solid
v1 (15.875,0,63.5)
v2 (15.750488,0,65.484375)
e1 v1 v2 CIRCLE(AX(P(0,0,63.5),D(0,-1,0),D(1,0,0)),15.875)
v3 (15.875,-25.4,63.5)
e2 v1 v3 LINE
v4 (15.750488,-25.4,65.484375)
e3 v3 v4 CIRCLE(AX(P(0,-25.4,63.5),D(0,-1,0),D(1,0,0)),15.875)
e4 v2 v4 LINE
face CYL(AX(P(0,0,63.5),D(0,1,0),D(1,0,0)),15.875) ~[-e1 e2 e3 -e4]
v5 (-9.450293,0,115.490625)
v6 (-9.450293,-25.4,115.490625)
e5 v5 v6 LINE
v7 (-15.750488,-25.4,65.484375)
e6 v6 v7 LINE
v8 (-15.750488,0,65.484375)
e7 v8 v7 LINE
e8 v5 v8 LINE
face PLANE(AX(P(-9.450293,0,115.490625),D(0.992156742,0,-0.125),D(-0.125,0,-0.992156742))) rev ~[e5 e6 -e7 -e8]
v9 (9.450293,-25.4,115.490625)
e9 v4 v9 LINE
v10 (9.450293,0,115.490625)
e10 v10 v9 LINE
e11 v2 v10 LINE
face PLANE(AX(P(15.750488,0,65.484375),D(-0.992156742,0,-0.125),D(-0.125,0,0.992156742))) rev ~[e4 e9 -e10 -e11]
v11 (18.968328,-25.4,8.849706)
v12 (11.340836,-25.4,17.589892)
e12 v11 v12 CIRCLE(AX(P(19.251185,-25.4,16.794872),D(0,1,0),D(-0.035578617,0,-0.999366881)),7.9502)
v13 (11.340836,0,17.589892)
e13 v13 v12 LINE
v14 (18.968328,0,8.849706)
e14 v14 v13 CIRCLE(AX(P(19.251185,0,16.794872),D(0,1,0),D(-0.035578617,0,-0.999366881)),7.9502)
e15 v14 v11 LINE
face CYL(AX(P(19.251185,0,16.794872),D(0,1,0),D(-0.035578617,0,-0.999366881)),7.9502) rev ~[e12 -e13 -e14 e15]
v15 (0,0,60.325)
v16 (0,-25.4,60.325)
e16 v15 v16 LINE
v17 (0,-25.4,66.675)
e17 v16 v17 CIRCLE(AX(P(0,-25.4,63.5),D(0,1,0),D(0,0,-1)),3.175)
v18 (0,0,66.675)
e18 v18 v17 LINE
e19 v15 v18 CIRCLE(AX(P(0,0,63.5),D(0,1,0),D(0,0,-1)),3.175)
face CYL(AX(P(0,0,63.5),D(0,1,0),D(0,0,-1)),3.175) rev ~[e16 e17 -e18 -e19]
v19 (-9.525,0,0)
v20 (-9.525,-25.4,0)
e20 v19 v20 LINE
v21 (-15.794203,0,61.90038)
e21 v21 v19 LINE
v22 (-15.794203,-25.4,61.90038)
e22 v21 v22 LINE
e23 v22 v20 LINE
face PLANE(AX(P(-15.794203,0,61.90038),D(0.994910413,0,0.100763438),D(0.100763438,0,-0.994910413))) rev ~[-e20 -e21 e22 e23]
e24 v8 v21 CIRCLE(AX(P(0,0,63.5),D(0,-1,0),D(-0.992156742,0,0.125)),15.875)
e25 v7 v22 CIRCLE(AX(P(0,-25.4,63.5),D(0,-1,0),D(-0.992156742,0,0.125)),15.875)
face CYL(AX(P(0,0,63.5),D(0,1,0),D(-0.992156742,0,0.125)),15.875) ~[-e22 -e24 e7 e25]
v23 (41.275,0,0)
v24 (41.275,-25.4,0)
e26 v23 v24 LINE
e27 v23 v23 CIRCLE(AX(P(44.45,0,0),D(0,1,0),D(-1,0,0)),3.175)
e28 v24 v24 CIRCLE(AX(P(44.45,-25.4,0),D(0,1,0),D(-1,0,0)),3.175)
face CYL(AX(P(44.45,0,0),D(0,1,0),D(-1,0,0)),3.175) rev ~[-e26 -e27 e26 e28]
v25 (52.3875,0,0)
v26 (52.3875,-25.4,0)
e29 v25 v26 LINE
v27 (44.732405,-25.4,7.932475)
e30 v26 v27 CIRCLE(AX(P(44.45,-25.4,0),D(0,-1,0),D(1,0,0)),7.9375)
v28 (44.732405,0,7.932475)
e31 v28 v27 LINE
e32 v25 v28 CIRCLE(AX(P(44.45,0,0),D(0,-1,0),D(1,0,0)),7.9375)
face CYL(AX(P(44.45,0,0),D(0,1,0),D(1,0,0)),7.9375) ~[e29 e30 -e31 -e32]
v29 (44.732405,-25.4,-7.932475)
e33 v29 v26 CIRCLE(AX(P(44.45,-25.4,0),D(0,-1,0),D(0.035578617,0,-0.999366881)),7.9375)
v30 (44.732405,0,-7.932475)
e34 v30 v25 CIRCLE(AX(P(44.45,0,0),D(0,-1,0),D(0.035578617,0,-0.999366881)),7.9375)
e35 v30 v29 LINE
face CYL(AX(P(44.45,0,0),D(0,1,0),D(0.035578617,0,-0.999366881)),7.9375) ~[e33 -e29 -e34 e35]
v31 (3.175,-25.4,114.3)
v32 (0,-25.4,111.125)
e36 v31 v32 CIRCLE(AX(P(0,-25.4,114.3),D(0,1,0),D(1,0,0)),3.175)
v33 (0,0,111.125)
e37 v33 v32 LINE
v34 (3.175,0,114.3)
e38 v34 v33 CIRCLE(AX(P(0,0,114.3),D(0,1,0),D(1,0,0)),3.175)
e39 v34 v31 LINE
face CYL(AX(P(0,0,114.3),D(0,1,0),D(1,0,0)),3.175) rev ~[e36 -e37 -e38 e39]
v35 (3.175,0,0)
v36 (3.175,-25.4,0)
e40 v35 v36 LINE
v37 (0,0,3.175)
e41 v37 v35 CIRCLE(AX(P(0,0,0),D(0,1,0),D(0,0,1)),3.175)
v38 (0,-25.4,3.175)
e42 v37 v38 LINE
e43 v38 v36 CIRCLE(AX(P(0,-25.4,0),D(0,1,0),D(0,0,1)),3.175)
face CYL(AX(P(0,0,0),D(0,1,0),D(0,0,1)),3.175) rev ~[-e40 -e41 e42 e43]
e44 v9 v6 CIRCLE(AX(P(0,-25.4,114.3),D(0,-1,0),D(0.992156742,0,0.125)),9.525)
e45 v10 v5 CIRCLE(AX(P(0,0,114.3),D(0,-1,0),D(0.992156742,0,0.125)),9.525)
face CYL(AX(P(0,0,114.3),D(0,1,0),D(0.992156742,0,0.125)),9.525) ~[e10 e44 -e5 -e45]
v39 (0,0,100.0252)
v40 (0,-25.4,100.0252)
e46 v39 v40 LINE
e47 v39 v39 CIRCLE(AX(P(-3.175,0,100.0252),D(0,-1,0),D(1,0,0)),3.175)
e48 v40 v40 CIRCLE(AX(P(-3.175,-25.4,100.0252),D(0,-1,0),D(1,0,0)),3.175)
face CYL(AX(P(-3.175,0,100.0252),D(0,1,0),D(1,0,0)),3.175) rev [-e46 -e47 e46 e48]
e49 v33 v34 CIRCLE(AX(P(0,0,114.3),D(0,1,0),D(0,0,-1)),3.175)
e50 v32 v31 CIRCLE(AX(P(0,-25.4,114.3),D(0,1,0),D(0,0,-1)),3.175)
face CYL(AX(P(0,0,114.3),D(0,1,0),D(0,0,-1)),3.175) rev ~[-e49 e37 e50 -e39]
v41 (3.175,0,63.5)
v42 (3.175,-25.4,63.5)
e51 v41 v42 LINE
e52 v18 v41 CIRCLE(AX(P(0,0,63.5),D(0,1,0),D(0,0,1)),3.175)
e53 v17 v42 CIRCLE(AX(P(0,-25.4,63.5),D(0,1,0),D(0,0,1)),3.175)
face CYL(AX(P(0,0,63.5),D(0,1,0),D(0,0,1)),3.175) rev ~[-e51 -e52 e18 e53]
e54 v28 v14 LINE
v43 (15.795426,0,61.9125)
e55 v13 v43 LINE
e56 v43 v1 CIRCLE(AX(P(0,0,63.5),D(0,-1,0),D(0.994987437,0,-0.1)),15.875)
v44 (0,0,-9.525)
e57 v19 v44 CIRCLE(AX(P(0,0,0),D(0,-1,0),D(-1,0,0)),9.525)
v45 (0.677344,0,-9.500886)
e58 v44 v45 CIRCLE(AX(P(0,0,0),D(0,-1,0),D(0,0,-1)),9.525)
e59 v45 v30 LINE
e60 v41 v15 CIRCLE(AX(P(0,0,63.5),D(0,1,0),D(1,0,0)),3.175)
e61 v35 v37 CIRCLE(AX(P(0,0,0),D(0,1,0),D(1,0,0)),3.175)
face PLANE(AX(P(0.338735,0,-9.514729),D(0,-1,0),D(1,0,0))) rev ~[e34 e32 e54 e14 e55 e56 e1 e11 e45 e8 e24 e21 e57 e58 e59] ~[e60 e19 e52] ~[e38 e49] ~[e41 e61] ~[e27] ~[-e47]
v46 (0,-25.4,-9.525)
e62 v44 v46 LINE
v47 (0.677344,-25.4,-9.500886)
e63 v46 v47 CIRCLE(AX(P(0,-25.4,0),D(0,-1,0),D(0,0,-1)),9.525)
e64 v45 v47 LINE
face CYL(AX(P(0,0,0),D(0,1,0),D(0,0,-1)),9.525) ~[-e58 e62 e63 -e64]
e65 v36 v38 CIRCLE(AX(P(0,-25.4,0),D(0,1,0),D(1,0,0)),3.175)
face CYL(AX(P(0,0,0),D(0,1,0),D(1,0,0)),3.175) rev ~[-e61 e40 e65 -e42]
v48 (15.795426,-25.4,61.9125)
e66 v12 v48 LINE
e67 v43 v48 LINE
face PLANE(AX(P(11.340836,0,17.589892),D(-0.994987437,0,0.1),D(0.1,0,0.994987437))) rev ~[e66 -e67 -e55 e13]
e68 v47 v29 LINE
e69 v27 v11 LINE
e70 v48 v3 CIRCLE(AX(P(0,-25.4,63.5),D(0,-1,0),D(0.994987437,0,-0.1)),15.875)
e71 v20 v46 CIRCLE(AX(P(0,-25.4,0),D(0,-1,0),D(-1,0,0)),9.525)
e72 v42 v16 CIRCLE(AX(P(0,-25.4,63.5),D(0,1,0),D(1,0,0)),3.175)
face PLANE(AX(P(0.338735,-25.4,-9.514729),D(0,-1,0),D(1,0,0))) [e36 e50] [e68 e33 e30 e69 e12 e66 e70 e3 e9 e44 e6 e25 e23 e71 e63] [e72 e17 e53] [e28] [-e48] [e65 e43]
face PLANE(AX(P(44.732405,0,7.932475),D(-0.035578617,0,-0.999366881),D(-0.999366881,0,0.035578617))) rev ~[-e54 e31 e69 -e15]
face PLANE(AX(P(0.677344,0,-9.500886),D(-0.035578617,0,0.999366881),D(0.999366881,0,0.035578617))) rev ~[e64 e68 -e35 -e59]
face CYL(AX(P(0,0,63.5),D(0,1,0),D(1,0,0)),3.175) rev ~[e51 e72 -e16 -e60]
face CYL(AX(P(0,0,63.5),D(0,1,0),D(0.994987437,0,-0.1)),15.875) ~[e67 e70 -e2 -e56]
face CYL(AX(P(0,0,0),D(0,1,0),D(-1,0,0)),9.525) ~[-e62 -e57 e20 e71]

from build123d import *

# Parameters (mm, degrees)
F0_R     = 3.175
F1_DEPTH = 25.4


with BuildPart() as f1:
    # F0 (on Front) → F1 (new body)
    with BuildSketch(Plane.XZ):
        with BuildLine():
            Line((0.6773435479, -9.500885786), (0, -9.525))
            ThreePointArc((0, -9.525), (0.3388863295, -9.5189695375), (0.6773435479, -9.500885786))
        make_face()
        with BuildLine():
            Line((-15.7942028036, 61.9003804205), (-9.525, 0))
            ThreePointArc((-9.525, 0), (-6.7351920908, 6.7351920908), (0, 9.525))
            Line((0, 9.525), (0, 47.625))
            ThreePointArc((0, 47.625), (-10.644756084, 51.722700101), (-15.7942028036, 61.9003804205))
        make_face()
        with BuildLine():
            ThreePointArc((9.525, 0), (6.9705567315, -6.4912990883), (0.6773435479, -9.500885786))
            Line((0.6773435479, -9.500885786), (44.7324052746, -7.9324746146))
            ThreePointArc((44.7324052746, -7.9324746146), (38.9380895153, -5.7116327839), (36.5125, 0))
            Line((36.5125, 0), (9.525, 0))
        make_face()
        with BuildLine():
            Line((0, 100.0252), (0, 79.375))
            ThreePointArc((0, 79.375), (10.5003255158, 75.40625), (15.7504882737, 65.484375))
            Line((15.7504882737, 65.484375), (9.4502929642, 115.490625))
            ThreePointArc((9.4502929642, 115.490625), (9.5063048942, 114.896483242), (9.525, 114.3))
            ThreePointArc((9.525, 114.3), (6.7351920908, 107.5648079092), (0, 104.775))
            Line((0, 104.775), (0, 100.0252))
        make_face()
        with BuildLine():
            ThreePointArc((36.5125, 0), (38.9380895153, -5.7116327839), (44.7324052746, -7.9324746146))
            ThreePointArc((44.7324052746, -7.9324746146), (50.1616327839, -5.5119104847), (52.3875, 0))
            ThreePointArc((52.3875, 0), (50.1616327839, 5.5119104847), (44.7324052746, 7.9324746146))
            ThreePointArc((44.7324052746, 7.9324746146), (38.9380895153, 5.7116327839), (36.5125, 0))
        make_face()
        with BuildLine():
            ThreePointArc((47.625, 0), (44.45, -3.175), (41.275, 0))
            ThreePointArc((41.275, 0), (44.45, 3.175), (47.625, 0))
        make_face(mode=Mode.SUBTRACT)
        with BuildLine():
            ThreePointArc((9.4502929642, 115.490625), (0, 123.825), (-9.4502929642, 115.490625))
            ThreePointArc((-9.4502929642, 115.490625), (-7.14375, 107.9998046905), (0, 104.775))
            ThreePointArc((0, 104.775), (6.7351920908, 107.5648079092), (9.525, 114.3))
            ThreePointArc((9.525, 114.3), (9.5063048942, 114.896483242), (9.4502929642, 115.490625))
        make_face()
        with BuildLine():
            ThreePointArc((3.175, 114.3), (2.2450640303, 112.0549359697), (0, 111.125))
            ThreePointArc((0, 111.125), (-2.2450640303, 116.5450640303), (3.175, 114.3))
        make_face(mode=Mode.SUBTRACT)
        with BuildLine():
            Line((0, 60.325), (0, 47.625))
            ThreePointArc((0, 47.625), (10.6492737428, 51.7267849017), (15.7954255641, 61.9125))
            ThreePointArc((15.7954255641, 61.9125), (15.8550939106, 62.7052534459), (15.875, 63.5))
            ThreePointArc((15.875, 63.5), (15.8438414904, 64.4941387366), (15.7504882737, 65.484375))
            ThreePointArc((15.7504882737, 65.484375), (10.5003255158, 75.40625), (0, 79.375))
            Line((0, 79.375), (0, 66.675))
            ThreePointArc((0, 66.675), (2.2450640303, 65.7450640303), (3.175, 63.5))
            ThreePointArc((3.175, 63.5), (2.2450640303, 61.2549359697), (0, 60.325))
        make_face()
        with BuildLine():
            ThreePointArc((-15.7504882737, 65.484375), (-15.8738192656, 63.6936154008), (-15.7942028036, 61.9003804205))
            ThreePointArc((-15.7942028036, 61.9003804205), (-10.644756084, 51.722700101), (0, 47.625))
            Line((0, 47.625), (0, 60.325))
            ThreePointArc((0, 60.325), (-3.175, 63.5), (0, 66.675))
            Line((0, 66.675), (0, 79.375))
            ThreePointArc((0, 79.375), (-10.5003255158, 75.40625), (-15.7504882737, 65.484375))
        make_face()
        with BuildLine():
            Line((0, 47.625), (0, 9.525))
            ThreePointArc((0, 9.525), (6.7351920908, 6.7351920908), (9.525, 0))
            Line((9.525, 0), (36.5125, 0))
            ThreePointArc((36.5125, 0), (38.9380895153, 5.7116327839), (44.7324052746, 7.9324746146))
            Line((44.7324052746, 7.9324746146), (18.968327868, 8.8497055806))
            ThreePointArc((18.968327868, 8.8497055806), (13.2612039825, 11.5674628959), (11.3408358685, 17.5898921545))
            Line((11.3408358685, 17.5898921545), (15.7954255641, 61.9125))
            ThreePointArc((15.7954255641, 61.9125), (10.6492737428, 51.7267849017), (0, 47.625))
        make_face()
        with BuildLine():
            ThreePointArc((0, 9.525), (-6.7351920908, 6.7351920908), (-9.525, 0))
            ThreePointArc((-9.525, 0), (-6.7351920908, -6.7351920908), (0, -9.525))
            Line((0, -9.525), (0.6773435479, -9.500885786))
            ThreePointArc((0.6773435479, -9.500885786), (6.9705567315, -6.4912990883), (9.525, 0))
            Line((9.525, 0), (3.175, 0))
            ThreePointArc((3.175, 0), (-2.2450640303, -2.2450640303), (0, 3.175))
            Line((0, 3.175), (0, 9.525))
        make_face()
        with BuildLine():
            ThreePointArc((9.525, 0), (6.7351920908, 6.7351920908), (0, 9.525))
            Line((0, 9.525), (0, 3.175))
            ThreePointArc((0, 3.175), (2.2450640303, 2.2450640303), (3.175, 0))
            Line((3.175, 0), (9.525, 0))
        make_face()
        with BuildLine():
            Line((-9.4502929642, 115.490625), (-15.7504882737, 65.484375))
            ThreePointArc((-15.7504882737, 65.484375), (-10.5003255158, 75.40625), (0, 79.375))
            Line((0, 79.375), (0, 100.0252))
            Line((0, 100.0252), (0, 104.775))
            ThreePointArc((0, 104.775), (-7.14375, 107.9998046905), (-9.4502929642, 115.490625))
        make_face()
        with Locations((-3.175, 100.0252)):
            Circle(F0_R, mode=Mode.SUBTRACT)
    extrude(amount=F1_DEPTH)


solid = f1.part
